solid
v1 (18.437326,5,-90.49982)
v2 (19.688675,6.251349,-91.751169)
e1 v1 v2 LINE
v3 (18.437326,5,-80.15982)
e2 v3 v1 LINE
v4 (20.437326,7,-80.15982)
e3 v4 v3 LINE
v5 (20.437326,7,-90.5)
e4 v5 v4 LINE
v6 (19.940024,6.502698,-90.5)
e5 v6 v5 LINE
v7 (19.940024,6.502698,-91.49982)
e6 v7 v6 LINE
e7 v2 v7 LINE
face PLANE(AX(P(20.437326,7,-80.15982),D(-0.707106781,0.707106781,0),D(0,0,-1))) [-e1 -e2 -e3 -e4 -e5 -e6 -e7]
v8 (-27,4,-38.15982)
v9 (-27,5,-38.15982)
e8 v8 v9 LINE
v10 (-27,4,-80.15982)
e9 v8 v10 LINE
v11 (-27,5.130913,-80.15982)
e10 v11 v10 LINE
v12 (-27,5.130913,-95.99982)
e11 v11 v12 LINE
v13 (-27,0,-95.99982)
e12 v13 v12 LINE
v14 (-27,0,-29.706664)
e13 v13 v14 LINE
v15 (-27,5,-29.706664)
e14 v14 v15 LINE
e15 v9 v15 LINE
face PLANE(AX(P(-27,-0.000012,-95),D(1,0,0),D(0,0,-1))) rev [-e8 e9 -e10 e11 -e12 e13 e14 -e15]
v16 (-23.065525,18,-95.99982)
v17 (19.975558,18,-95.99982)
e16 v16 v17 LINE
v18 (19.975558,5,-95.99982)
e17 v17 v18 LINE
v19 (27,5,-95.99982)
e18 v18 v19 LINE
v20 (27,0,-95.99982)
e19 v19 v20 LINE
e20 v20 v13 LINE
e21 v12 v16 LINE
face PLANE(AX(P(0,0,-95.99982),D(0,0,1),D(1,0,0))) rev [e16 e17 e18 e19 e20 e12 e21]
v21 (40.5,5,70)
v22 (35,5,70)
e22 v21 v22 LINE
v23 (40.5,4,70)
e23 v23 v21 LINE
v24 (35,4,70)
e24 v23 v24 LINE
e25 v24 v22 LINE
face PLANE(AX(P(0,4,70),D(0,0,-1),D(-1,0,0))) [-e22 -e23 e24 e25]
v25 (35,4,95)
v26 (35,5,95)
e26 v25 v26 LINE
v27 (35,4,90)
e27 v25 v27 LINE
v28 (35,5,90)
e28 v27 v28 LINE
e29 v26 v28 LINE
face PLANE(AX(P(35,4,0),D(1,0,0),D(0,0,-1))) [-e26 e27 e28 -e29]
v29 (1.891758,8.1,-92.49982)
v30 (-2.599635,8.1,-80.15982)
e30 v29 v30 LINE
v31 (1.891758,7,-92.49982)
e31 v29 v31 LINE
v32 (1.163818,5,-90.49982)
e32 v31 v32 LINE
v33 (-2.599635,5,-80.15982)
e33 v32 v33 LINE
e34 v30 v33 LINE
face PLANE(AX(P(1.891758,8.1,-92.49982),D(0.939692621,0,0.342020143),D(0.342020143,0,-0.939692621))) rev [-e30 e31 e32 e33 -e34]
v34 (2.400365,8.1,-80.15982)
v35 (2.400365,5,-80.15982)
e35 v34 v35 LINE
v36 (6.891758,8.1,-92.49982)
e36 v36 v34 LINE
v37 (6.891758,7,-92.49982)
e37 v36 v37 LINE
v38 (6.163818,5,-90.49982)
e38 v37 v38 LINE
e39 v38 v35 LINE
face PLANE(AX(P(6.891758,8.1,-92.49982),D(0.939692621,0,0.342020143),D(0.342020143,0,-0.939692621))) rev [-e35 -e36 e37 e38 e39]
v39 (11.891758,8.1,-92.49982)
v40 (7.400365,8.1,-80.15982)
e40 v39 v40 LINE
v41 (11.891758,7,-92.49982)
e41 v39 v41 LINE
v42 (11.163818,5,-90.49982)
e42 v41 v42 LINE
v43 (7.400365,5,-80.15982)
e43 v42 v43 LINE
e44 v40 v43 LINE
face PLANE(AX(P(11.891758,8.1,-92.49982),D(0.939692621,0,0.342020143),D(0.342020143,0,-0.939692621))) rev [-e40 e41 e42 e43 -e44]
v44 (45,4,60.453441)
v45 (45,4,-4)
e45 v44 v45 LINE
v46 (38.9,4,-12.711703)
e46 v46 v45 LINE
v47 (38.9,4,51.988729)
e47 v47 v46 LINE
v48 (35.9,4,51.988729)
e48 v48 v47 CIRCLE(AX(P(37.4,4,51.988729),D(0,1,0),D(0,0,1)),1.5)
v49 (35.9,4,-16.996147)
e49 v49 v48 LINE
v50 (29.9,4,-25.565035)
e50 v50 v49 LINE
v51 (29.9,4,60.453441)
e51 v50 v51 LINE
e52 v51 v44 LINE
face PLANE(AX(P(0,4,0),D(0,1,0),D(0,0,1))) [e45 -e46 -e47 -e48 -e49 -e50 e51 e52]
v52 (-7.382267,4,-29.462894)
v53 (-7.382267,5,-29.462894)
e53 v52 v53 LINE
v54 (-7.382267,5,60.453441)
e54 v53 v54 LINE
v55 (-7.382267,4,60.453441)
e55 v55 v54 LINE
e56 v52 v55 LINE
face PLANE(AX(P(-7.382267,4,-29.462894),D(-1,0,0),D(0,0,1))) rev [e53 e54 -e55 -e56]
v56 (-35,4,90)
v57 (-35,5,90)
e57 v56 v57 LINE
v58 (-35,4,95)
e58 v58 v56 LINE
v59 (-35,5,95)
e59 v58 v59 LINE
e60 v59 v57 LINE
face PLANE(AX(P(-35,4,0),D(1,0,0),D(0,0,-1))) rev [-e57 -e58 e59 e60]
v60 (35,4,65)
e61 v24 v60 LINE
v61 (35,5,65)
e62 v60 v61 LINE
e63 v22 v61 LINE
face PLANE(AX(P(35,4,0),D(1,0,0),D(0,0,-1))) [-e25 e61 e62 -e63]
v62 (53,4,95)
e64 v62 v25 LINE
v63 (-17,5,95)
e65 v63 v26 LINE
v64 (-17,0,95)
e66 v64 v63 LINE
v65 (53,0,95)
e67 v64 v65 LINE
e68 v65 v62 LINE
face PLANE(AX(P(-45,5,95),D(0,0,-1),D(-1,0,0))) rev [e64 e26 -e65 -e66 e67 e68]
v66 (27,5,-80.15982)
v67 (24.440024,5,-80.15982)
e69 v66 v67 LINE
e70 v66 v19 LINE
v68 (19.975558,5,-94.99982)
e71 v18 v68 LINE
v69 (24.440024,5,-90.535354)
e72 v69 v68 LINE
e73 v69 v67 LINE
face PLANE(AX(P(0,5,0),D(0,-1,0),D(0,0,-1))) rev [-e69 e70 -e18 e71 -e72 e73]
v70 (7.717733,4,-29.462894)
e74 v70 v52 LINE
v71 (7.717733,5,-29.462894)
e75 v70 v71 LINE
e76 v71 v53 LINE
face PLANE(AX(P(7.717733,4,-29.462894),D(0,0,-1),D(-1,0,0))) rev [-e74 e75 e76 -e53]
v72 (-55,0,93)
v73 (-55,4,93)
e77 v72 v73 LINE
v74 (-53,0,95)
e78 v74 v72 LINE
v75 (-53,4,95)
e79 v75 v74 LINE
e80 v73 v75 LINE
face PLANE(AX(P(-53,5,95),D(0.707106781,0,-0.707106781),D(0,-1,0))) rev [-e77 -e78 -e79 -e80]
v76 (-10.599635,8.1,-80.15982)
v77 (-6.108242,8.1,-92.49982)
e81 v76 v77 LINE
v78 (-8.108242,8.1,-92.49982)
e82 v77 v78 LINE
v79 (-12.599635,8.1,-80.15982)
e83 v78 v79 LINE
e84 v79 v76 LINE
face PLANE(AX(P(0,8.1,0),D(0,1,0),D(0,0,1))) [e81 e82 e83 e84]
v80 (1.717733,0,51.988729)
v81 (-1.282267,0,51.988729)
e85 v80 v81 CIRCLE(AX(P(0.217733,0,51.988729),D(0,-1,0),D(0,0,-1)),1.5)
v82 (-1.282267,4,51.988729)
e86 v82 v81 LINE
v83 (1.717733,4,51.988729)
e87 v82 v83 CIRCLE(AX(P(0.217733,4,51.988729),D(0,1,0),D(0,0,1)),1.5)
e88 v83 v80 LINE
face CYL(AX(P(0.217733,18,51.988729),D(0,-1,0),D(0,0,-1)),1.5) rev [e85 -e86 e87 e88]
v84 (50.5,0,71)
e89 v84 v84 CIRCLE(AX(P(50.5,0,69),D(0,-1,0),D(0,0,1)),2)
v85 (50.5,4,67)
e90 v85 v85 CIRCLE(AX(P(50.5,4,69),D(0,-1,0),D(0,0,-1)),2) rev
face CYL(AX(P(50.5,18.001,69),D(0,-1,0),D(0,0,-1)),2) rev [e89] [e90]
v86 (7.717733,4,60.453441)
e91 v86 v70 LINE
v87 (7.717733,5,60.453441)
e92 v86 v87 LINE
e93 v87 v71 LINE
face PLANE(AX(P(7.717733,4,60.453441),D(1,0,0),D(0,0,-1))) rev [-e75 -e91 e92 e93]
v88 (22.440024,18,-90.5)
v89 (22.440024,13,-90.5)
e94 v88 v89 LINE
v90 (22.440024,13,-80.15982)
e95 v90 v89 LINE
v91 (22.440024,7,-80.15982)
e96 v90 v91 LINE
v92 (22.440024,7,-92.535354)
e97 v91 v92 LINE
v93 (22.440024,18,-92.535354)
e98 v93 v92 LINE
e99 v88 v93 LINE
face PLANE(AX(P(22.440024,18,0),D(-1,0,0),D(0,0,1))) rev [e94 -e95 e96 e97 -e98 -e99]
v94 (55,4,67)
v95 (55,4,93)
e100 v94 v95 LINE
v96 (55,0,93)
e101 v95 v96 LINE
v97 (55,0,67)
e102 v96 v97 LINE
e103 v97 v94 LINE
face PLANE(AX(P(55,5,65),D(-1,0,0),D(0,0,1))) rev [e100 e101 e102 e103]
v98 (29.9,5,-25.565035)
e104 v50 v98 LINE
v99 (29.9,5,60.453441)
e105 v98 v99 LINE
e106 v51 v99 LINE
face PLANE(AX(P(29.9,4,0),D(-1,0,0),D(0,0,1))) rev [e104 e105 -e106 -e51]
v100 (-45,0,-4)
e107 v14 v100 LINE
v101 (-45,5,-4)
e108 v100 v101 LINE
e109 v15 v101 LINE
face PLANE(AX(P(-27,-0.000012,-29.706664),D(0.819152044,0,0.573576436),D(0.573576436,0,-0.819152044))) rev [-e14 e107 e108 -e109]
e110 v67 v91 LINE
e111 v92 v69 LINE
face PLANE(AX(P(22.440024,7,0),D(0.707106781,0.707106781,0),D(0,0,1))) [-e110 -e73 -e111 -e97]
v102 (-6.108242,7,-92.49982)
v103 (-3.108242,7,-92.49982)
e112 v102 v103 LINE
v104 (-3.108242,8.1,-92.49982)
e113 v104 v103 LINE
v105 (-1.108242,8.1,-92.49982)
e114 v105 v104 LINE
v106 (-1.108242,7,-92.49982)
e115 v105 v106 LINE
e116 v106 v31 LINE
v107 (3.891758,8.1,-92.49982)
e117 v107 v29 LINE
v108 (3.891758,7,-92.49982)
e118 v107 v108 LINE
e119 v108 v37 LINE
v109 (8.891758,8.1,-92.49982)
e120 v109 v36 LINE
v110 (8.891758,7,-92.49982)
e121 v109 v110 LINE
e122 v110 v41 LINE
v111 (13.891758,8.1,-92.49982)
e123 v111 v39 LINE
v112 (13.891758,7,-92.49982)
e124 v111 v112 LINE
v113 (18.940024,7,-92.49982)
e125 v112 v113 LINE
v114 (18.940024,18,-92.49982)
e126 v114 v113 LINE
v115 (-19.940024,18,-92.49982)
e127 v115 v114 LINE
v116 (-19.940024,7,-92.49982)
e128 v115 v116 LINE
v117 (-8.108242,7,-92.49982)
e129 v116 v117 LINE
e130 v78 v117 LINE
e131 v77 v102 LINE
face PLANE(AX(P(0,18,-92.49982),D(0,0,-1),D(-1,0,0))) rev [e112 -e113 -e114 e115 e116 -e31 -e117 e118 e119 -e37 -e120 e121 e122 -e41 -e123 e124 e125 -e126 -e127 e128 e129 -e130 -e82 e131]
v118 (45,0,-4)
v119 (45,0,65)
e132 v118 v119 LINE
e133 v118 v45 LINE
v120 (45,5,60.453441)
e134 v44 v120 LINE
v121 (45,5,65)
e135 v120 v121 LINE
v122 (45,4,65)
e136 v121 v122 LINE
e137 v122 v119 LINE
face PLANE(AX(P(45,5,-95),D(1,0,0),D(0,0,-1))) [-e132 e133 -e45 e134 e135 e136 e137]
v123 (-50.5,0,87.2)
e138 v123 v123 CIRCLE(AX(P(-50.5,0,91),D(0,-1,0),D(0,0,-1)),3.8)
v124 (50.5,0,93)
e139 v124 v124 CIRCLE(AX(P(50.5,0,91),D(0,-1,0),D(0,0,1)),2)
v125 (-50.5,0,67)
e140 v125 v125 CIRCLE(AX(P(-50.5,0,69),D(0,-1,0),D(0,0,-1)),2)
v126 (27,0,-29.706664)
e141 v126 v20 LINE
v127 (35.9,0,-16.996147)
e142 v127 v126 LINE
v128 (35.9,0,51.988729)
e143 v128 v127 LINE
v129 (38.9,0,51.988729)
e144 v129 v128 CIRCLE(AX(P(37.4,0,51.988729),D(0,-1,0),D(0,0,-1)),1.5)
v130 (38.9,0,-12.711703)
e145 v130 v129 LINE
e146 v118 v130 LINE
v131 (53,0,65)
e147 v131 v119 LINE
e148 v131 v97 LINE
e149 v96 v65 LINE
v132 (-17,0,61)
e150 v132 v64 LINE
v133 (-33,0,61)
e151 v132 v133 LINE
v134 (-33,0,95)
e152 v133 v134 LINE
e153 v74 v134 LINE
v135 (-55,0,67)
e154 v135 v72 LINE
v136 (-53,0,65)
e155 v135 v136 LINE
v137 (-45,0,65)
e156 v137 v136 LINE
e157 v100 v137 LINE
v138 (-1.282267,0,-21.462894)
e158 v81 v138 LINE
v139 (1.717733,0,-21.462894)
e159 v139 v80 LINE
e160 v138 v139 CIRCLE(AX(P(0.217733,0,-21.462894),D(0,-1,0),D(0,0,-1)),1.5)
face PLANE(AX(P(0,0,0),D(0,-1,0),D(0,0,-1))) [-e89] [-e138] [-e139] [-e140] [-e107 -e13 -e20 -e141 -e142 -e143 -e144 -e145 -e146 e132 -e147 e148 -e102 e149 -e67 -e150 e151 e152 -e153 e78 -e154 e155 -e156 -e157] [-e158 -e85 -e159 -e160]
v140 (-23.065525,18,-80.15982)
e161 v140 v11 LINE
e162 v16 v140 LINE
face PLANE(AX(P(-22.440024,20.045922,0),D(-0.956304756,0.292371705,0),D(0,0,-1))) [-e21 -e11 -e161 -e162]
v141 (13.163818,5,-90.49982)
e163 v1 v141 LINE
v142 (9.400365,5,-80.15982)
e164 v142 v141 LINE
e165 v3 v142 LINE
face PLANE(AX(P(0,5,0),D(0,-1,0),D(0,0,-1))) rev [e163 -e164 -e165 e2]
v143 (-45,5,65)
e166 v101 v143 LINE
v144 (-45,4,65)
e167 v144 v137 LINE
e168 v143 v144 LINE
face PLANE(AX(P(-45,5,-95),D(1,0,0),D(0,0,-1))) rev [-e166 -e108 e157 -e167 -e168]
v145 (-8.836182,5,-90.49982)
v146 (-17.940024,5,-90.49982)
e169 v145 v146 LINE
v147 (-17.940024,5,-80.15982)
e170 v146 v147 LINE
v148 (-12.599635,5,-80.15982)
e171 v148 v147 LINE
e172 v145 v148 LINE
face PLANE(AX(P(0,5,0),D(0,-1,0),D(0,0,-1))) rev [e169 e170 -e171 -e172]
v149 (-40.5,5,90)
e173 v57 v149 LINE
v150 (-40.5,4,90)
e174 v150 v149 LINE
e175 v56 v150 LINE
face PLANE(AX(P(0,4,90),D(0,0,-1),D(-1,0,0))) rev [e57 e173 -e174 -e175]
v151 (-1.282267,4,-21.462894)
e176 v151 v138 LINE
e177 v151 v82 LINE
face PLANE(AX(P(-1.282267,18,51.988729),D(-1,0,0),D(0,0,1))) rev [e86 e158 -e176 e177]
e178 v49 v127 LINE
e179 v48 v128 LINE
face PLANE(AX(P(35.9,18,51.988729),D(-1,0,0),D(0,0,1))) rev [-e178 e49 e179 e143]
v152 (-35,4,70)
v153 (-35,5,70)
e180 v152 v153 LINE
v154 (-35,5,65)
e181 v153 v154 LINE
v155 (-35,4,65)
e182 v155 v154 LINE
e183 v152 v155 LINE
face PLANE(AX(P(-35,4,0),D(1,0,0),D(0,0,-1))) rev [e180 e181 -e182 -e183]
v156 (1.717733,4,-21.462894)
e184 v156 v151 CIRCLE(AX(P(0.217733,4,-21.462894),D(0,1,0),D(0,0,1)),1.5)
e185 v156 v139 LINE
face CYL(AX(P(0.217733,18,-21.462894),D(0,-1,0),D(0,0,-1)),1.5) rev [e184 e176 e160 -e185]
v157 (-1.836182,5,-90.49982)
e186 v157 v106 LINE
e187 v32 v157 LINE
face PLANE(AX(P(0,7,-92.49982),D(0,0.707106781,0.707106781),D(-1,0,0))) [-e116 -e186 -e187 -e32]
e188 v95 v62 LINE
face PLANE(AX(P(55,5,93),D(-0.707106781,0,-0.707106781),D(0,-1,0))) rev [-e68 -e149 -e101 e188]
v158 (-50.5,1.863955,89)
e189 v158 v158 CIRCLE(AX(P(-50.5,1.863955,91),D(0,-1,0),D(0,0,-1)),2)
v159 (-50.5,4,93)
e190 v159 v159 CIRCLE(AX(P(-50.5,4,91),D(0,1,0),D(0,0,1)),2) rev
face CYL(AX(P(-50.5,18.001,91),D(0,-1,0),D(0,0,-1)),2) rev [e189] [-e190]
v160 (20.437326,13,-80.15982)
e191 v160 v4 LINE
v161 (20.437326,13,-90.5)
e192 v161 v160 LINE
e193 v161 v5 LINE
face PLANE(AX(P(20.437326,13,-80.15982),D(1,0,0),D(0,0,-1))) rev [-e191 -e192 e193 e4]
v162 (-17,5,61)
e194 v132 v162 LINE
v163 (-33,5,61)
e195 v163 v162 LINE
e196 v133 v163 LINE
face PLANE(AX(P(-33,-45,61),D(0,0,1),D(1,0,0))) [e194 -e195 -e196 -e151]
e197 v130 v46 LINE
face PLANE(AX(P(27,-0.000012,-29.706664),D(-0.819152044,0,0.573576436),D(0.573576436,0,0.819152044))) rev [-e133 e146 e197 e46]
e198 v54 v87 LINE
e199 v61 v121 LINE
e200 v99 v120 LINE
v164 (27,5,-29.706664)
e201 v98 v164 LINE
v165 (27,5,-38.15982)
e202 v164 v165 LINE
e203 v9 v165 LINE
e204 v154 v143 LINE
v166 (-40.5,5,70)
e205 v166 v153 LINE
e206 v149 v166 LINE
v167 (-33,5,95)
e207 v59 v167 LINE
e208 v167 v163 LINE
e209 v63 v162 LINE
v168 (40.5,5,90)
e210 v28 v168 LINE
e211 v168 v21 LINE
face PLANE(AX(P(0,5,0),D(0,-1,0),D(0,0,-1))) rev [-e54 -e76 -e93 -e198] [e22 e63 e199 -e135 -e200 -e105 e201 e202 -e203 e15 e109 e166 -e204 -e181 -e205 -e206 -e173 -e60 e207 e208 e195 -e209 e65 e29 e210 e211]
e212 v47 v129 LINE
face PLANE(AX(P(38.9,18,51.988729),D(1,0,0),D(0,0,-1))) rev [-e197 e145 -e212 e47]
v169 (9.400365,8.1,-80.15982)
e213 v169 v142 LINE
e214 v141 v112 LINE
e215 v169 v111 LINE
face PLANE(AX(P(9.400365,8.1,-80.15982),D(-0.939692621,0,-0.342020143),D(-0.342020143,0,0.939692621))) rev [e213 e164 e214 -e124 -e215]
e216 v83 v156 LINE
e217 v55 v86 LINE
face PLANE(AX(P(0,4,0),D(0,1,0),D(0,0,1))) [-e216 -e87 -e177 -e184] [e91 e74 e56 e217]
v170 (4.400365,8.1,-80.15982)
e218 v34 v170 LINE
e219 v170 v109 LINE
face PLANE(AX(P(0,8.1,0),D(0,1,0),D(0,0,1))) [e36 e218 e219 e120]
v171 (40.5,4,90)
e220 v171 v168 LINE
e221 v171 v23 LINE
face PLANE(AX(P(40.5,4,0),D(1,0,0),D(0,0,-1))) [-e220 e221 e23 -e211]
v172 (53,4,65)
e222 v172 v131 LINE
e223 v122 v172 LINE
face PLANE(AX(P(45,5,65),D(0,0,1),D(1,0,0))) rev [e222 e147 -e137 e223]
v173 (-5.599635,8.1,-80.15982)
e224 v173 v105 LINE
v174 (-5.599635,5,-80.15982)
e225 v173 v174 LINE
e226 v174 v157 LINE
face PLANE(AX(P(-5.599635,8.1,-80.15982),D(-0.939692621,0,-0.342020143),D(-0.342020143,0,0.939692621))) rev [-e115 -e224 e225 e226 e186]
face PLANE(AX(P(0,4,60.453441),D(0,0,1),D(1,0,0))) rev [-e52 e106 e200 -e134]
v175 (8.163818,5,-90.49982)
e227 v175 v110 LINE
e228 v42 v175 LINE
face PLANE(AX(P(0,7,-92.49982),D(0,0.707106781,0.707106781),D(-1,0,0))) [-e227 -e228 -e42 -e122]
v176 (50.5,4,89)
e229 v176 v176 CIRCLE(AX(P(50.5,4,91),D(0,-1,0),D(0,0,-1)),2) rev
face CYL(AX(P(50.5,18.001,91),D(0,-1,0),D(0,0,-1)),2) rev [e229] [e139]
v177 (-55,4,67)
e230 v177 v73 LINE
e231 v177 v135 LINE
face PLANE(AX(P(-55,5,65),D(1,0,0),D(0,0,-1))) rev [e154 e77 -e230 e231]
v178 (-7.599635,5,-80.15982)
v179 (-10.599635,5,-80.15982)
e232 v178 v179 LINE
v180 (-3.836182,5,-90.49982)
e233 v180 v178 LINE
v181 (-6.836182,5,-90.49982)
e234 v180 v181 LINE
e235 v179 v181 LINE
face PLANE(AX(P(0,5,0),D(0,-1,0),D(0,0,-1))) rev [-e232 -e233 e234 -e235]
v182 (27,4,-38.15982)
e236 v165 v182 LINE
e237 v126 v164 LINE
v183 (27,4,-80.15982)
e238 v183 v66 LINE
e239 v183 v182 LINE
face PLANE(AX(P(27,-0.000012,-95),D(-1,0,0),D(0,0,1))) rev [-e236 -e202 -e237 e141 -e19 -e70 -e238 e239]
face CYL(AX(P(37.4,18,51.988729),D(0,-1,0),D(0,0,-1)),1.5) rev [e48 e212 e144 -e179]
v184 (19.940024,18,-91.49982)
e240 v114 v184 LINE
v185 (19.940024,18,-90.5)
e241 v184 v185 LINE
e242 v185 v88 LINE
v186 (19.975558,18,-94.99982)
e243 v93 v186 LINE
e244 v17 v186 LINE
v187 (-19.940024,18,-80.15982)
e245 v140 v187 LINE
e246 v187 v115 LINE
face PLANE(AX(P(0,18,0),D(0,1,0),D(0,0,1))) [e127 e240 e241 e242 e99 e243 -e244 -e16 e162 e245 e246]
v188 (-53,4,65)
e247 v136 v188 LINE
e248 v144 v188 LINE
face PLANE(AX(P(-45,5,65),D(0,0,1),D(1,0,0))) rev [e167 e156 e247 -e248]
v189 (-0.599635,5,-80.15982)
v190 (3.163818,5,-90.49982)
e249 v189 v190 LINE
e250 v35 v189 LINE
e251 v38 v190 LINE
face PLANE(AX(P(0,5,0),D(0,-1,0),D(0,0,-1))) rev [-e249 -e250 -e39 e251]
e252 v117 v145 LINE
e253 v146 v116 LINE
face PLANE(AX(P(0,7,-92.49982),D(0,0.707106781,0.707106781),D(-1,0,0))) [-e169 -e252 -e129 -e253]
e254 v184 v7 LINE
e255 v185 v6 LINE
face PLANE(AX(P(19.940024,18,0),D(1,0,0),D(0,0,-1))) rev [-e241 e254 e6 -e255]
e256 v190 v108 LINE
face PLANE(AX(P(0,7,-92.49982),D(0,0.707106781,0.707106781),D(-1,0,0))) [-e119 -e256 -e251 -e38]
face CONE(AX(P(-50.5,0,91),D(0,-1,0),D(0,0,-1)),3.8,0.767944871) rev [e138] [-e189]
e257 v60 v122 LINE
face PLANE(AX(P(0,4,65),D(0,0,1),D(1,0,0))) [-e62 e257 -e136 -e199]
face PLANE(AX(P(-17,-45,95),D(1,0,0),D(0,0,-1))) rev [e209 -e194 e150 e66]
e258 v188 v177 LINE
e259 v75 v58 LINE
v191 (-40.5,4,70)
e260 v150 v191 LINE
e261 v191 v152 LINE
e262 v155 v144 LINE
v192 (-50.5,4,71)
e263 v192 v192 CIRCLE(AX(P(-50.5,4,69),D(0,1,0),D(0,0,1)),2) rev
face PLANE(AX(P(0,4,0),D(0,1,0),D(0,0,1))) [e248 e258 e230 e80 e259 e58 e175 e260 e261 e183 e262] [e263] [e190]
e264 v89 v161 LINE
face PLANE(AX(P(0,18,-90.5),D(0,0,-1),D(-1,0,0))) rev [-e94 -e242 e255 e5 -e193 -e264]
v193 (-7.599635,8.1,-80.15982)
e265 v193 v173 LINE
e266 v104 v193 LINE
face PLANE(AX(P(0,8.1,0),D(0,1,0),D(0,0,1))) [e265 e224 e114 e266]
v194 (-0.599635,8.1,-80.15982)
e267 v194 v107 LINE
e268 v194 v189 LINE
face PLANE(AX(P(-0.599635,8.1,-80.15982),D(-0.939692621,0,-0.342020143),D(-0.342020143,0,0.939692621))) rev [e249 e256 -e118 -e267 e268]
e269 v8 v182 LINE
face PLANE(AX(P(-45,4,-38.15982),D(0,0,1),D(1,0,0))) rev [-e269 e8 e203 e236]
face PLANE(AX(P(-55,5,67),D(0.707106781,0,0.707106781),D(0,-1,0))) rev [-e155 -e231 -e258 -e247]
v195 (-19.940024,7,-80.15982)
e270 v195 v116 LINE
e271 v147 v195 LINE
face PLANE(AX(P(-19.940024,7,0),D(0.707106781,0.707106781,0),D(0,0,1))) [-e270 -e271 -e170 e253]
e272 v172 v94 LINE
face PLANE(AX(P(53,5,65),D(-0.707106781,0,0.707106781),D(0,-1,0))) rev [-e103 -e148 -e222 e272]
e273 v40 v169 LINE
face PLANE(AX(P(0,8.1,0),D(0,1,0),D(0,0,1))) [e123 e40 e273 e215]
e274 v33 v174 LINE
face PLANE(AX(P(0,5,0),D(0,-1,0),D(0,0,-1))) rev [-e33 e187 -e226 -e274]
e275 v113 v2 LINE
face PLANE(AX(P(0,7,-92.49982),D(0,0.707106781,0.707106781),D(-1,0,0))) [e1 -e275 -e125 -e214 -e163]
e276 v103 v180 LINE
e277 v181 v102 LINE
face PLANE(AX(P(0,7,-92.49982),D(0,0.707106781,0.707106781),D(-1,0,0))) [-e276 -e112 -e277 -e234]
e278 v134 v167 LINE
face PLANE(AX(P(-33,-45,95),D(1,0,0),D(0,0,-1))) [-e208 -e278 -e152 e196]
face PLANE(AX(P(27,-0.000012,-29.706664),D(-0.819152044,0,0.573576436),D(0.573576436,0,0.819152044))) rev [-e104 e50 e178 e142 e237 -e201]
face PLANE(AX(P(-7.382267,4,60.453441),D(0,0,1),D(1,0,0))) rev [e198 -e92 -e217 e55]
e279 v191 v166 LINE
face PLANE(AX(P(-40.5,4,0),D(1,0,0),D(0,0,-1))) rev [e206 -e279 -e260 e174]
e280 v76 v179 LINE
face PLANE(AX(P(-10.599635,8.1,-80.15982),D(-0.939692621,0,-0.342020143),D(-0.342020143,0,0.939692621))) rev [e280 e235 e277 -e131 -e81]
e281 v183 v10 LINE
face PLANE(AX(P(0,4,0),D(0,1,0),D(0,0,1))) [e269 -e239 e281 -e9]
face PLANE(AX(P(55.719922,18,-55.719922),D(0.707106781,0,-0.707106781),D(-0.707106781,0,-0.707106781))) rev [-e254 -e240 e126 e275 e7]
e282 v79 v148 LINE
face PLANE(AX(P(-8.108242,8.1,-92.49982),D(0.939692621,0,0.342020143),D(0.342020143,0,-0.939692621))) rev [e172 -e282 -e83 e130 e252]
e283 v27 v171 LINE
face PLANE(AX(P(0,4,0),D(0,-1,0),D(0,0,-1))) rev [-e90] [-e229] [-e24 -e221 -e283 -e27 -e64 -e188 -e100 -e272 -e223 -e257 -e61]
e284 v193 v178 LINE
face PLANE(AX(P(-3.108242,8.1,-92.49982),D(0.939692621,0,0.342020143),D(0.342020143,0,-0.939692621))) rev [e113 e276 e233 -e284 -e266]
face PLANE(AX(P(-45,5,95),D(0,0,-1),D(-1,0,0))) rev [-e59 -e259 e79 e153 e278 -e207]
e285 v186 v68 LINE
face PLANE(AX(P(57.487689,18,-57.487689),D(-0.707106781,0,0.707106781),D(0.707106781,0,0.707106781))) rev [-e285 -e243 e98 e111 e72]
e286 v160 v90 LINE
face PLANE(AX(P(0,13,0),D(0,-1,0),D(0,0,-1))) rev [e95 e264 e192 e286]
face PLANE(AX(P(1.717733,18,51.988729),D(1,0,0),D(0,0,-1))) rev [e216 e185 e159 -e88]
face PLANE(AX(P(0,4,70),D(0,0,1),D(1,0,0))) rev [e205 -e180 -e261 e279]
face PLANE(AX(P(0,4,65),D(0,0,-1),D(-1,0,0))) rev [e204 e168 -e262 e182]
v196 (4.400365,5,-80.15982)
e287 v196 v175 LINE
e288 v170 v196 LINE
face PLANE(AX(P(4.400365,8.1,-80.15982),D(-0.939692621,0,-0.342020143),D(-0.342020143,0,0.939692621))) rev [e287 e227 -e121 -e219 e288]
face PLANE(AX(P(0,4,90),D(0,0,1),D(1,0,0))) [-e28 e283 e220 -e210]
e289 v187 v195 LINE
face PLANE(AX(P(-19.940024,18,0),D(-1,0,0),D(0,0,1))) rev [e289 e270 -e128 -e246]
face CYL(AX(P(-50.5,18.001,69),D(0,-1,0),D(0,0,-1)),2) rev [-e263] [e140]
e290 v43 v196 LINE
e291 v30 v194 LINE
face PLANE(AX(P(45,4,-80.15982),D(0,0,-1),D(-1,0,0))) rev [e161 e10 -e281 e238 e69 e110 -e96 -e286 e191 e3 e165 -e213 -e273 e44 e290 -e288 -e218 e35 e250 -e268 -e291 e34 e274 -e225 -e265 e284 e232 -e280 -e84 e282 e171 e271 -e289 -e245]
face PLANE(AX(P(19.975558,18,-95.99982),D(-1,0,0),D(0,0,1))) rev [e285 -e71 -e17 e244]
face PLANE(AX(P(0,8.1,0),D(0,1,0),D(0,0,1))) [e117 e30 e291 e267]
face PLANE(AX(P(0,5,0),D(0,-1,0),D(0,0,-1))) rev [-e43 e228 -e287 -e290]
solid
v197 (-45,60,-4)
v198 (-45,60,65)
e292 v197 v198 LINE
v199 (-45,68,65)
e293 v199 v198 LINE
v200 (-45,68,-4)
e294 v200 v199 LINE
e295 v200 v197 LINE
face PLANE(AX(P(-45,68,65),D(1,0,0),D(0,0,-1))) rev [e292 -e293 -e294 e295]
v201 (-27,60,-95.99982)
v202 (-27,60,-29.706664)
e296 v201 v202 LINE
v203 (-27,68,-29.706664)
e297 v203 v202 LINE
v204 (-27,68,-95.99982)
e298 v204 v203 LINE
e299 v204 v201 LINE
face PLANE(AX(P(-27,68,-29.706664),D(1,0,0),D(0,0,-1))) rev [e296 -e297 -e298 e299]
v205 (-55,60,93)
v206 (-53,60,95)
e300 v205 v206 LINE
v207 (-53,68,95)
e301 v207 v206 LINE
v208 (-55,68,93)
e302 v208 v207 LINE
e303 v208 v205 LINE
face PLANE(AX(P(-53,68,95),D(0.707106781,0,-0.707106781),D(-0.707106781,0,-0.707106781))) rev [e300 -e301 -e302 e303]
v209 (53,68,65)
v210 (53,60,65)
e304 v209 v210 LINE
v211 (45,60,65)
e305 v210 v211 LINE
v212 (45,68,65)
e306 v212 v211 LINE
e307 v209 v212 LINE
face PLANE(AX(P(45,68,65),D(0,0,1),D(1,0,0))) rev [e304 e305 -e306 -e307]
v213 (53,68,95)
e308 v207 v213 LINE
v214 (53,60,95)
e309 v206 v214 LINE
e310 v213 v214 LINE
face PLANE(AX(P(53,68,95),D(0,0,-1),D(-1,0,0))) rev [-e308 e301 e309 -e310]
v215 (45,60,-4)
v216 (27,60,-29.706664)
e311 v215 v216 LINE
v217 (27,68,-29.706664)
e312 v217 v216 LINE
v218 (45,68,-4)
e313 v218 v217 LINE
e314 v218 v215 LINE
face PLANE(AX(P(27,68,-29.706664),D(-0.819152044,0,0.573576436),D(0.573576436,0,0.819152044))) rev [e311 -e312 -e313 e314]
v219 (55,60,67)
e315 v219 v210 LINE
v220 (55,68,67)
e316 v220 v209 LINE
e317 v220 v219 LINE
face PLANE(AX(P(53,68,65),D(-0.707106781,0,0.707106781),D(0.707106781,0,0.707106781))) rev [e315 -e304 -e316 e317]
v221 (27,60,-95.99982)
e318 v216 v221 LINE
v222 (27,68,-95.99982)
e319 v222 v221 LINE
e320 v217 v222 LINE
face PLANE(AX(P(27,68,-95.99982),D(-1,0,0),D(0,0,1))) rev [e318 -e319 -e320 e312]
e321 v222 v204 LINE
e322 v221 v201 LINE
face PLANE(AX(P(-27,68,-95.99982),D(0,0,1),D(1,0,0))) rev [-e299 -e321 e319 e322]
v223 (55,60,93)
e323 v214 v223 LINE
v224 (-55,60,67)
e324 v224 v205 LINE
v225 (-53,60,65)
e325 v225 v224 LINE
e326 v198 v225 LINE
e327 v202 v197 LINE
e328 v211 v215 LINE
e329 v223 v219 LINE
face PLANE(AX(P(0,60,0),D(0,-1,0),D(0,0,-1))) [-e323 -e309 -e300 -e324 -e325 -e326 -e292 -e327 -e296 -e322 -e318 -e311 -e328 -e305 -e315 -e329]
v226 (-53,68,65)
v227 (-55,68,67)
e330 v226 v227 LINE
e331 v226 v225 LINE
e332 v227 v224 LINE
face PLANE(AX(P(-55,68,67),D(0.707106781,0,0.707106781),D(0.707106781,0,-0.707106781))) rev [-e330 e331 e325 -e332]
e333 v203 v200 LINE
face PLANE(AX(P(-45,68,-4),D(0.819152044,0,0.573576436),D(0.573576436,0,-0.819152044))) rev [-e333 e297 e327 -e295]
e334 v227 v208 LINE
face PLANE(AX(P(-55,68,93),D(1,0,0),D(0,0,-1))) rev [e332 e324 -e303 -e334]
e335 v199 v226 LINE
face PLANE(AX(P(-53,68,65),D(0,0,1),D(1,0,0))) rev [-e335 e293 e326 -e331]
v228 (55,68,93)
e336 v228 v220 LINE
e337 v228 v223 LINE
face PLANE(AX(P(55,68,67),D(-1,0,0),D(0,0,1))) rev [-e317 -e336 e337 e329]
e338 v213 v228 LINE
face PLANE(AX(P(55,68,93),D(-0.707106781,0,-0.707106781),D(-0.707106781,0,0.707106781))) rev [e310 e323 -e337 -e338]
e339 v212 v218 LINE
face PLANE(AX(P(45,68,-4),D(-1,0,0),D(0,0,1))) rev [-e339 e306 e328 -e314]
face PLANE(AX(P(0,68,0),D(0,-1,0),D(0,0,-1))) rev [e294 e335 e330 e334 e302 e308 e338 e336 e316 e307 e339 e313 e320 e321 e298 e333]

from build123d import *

# Parameters (mm, degrees)
SKETCH1_W                     = 90
SKETCH1_H                     = 190
BOSS_EXTRUDE1_DEPTH           = 5
SKETCH2_W                     = 10
SKETCH2_H                     = 30
BOSS_EXTRUDE2_DEPTH           = 5
CHAMFER1_SIZE                 = 2
SKETCH3_W                     = 16
SKETCH3_H                     = 34
CUT_EXTRUDE1_DEPTH            = 50
SKETCH4_W                     = 90
SKETCH4_H                     = 42
CUT_EXTRUDE2_DEPTH            = 1
SKETCH7_W                     = 15.1
SKETCH7_H                     = 89.916335477
CUT_EXTRUDE7_DEPTH            = 1
BOSS_EXTRUDE4_START           = 5
BOSS_EXTRUDE4_DEPTH           = 13
BOSS_EXTRUDE5_DEPTH           = 3.1
CUT_EXTRUDE11_START           = 5
CUT_EXTRUDE11_DEPTH           = 1
CUT_EXTRUDE12_DEPTH           = 112.23848255
CUT_EXTRUDE12_DEPTH_BACK      = 112.23848255
BOSS_EXTRUDE6_DEPTH           = 1
CHAMFER4_SIZE                 = 2
CUT_EXTRUDE13_REACH           = 114.094
SKETCH23_R                    = 2
CUT_EXTRUDE14_DEPTH           = 113.093556715
CUT_EXTRUDE14_DEPTH_BACK      = 113.093556715
SKETCH26_R                    = 3.8
CUT_EXTRUDE15_DEPTH           = 2.5
CUT_EXTRUDE15_TAPER           = 44
CUT_EXTRUDE15_OTHER_WAY_DEPTH = 113.093556715
SKETCH27_W                    = 2.002698481
SKETCH27_H                    = 10.340179912
BOSS_EXTRUDE7_DEPTH           = 8
CHAMFER5_SIZE                 = 2
CHAMFER6_SIZE                 = 15.045922045
CHAMFER6_SIZE_2               = 4.6
CHAMFER7_SIZE                 = 2
BOSS_EXTRUDE8_START           = 60
BOSS_EXTRUDE8_DEPTH           = 8


with BuildPart() as part:
    # Sketch1 → Boss-Extrude1 (new body)
    with BuildSketch(Plane(origin=(0, 0, 0), x_dir=(1, 0, 0), z_dir=(0, 1, 0))):
        Rectangle(SKETCH1_W, SKETCH1_H)
    extrude(amount=BOSS_EXTRUDE1_DEPTH)

    # Sketch2 → Boss-Extrude2 (add)
    with BuildSketch(Plane(origin=(0, 0, 0), x_dir=(1, 0, 0), z_dir=(0, 1, 0))):
        with Locations((-50, -80)):
            Rectangle(SKETCH2_W, SKETCH2_H)
        with Locations((50, -80)):
            Rectangle(SKETCH2_W, SKETCH2_H)
    extrude(amount=BOSS_EXTRUDE2_DEPTH)

    # Chamfer1
    chamfer1_edges = [part.edges().sort_by_distance(p)[0] for p in [
        (-55, 2.5, 65),
        (-55, 2.5, 95),
        (55, 2.5, 95),
        (55, 2.5, 65),
    ]]
    chamfer(chamfer1_edges, length=CHAMFER1_SIZE)

    # Sketch3 → Cut-Extrude1 (cut)
    with BuildSketch(Plane(origin=(0, 5, 0), x_dir=(1, 0, 0), z_dir=(0, 1, 0))):
        with Locations((-25, -78)):
            Rectangle(SKETCH3_W, SKETCH3_H)
    extrude(amount=-CUT_EXTRUDE1_DEPTH, mode=Mode.SUBTRACT)

    # Sketch4 → Cut-Extrude2 (cut)
    with BuildSketch(Plane(origin=(0, 5, 0), x_dir=(1, 0, 0), z_dir=(0, 1, 0))):
        with Locations((0, 59.159820088)):
            Rectangle(SKETCH4_W, SKETCH4_H)
    extrude(amount=-CUT_EXTRUDE2_DEPTH, mode=Mode.SUBTRACT)

    # Sketch7 → Cut-Extrude7 (cut)
    with BuildSketch(Plane(origin=(0, 5, 0), x_dir=(1, 0, 0), z_dir=(0, 1, 0))):
        with Locations((37.45, -15.495273531)):
            Rectangle(SKETCH7_W, SKETCH7_H)
        with Locations((0.16773297, -15.495273531)):
            Rectangle(SKETCH7_W, SKETCH7_H)
    extrude(amount=-CUT_EXTRUDE7_DEPTH, mode=Mode.SUBTRACT)

    # Sketch17 → Boss-Extrude4 (add)
    with BuildSketch(Plane(origin=(0, 0, 0), x_dir=(1, 0, 0), z_dir=(0, 1, 0)).offset(BOSS_EXTRUDE4_START)):
        Polygon((-22.440023983, 80.159820088), (-19.940023983, 80.159820088), (-19.940023983, 92.499820088), (18.940023983, 92.499820088), (19.940023983, 91.499820088), (19.940023983, 90.5), (22.440023983, 90.5), (22.440023983, 92.535353994), (19.975557889, 94.999820088), (-22.440023983, 94.999820088), align=None)
    extrude(amount=BOSS_EXTRUDE4_DEPTH)

    # Sketch18 → Boss-Extrude5 (add)
    with BuildSketch(Plane(origin=(0, 5, 0), x_dir=(1, 0, 0), z_dir=(0, 1, 0))):
        Polygon((-12.599634528, 80.159820088), (-10.599634528, 80.159820088), (-6.108241837, 92.499820088), (-8.108241837, 92.499820088), align=None)
        Polygon((-3.108241837, 92.499820088), (-7.599634528, 80.159820088), (-5.599634528, 80.159820088), (-1.108241837, 92.499820088), align=None)
        Polygon((1.891758163, 92.499820088), (-2.599634528, 80.159820088), (-0.599634528, 80.159820088), (3.891758163, 92.499820088), align=None)
        Polygon((6.891758163, 92.499820088), (2.400365472, 80.159820088), (4.400365472, 80.159820088), (8.891758163, 92.499820088), align=None)
        Polygon((11.891758163, 92.499820088), (7.400365472, 80.159820088), (9.400365472, 80.159820088), (13.891758163, 92.499820088), align=None)
    extrude(amount=BOSS_EXTRUDE5_DEPTH)

    # Sketch19 → Cut-Extrude11 (cut)
    with BuildSketch(Plane(origin=(0, 0, 0), x_dir=(1, 0, 0), z_dir=(0, 1, 0)).offset(CUT_EXTRUDE11_START)):
        Polygon((-35, -65), (-35, -70), (-40.5, -70), (-40.5, -90), (-35, -90), (-35, -95), (-53, -95), (-55, -93), (-55, -67), (-53, -65), align=None)
    cut_extrude11 = extrude(amount=-CUT_EXTRUDE11_DEPTH, mode=Mode.SUBTRACT)

    # Mirror1: Cut-Extrude11 across plane
    add(cut_extrude11.mirror(Plane(origin=(0, 0, 0), x_dir=(0, 0, 1), z_dir=(1, 0, 0))), mode=Mode.SUBTRACT)

    # Sketch20 → Cut-Extrude12 (cut, two sides: drawn at the far end of the back side and taken through both)
    with BuildSketch(Plane(origin=(0, 0, 0), x_dir=(1, 0, 0), z_dir=(0, 1, 0)).offset(-CUT_EXTRUDE12_DEPTH_BACK)):
        Polygon((-27, 29.706664121), (-45, 4), (-45, 95), (-27, 95), align=None)
        Polygon((27, 95), (27, 29.706664121), (45, 4), (45, 95), align=None)
    extrude(amount=CUT_EXTRUDE12_DEPTH + CUT_EXTRUDE12_DEPTH_BACK, mode=Mode.SUBTRACT)

    # Sketch22 → Boss-Extrude6 (add)
    with BuildSketch(Plane(origin=(0, 0, -94.999820088), x_dir=(-1, 0, 0), z_dir=(0, 0, -1))):
        Polygon((-19.975557889, 5), (-27, 5), (-27, 0), (27, 0), (27, 5), (22.440023983, 5), (22.440023983, 18), (-19.975557889, 18), align=None)
    extrude(amount=BOSS_EXTRUDE6_DEPTH)

    # Chamfer4
    chamfer4_edges = [part.edges().sort_by_distance(p)[0] for p in [
        (-19.940023983, 5, -86.329820088),
        (-14.02413291, 5, -92.499820088),
        (-4.608241837, 5, -92.499820088),
        (0.391758163, 5, -92.499820088),
        (5.391758163, 5, -92.499820088),
        (10.391758163, 5, -92.499820088),
    ]]
    chamfer(chamfer4_edges, length=CHAMFER4_SIZE)

    # Sketch23 → Cut-Extrude13 (cut, up to next)
    with BuildSketch(Plane.XZ, mode=Mode.PRIVATE) as cut_extrude13_sk1:
        with Locations(Location((-50.5, 91, 0), (0, 0, 270))):
            Circle(SKETCH23_R)
    cut_extrude13_tool1 = extrude(cut_extrude13_sk1.sketch, amount=-CUT_EXTRUDE13_REACH, mode=Mode.PRIVATE) & part.part
    # Sketch23 → Cut-Extrude13 (cut, up to next)
    with BuildSketch(Plane.XZ, mode=Mode.PRIVATE) as cut_extrude13_sk2:
        with Locations(Location((-50.5, 69, 0), (0, 0, 270))):
            Circle(SKETCH23_R)
    cut_extrude13_tool2 = extrude(cut_extrude13_sk2.sketch, amount=-CUT_EXTRUDE13_REACH, mode=Mode.PRIVATE) & part.part
    # Sketch23 → Cut-Extrude13 (cut, up to next)
    with BuildSketch(Plane.XZ, mode=Mode.PRIVATE) as cut_extrude13_sk3:
        with Locations(Location((50.5, 69, 0), (0, 0, 270))):
            Circle(SKETCH23_R)
    cut_extrude13_tool3 = extrude(cut_extrude13_sk3.sketch, amount=-CUT_EXTRUDE13_REACH, mode=Mode.PRIVATE) & part.part
    # Sketch23 → Cut-Extrude13 (cut, up to next)
    with BuildSketch(Plane.XZ, mode=Mode.PRIVATE) as cut_extrude13_sk4:
        with Locations(Location((50.5, 91, 0), (0, 0, 270))):
            Circle(SKETCH23_R)
    cut_extrude13_tool4 = extrude(cut_extrude13_sk4.sketch, amount=-CUT_EXTRUDE13_REACH, mode=Mode.PRIVATE) & part.part
    add(cut_extrude13_tool1.solids().sort_by_distance((-50.5, 0, 91))[0], mode=Mode.SUBTRACT)
    add(cut_extrude13_tool2.solids().sort_by_distance((-50.5, 0, 69))[0], mode=Mode.SUBTRACT)
    add(cut_extrude13_tool3.solids().sort_by_distance((50.5, 0, 69))[0], mode=Mode.SUBTRACT)
    add(cut_extrude13_tool4.solids().sort_by_distance((50.5, 0, 91))[0], mode=Mode.SUBTRACT)

    # Sketch25 → Cut-Extrude14 (cut, two sides: drawn at the far end of the back side and taken through both)
    with BuildSketch(Plane.XZ.offset(-CUT_EXTRUDE14_DEPTH_BACK)):
        with BuildLine():
            Line((1.71773297, 51.988728589), (1.71773297, -21.462894208))
            ThreePointArc((1.71773297, -21.462894208), (0.21773297, -22.962894208), (-1.28226703, -21.462894208))
            Line((-1.28226703, -21.462894208), (-1.28226703, 51.988728589))
            ThreePointArc((-1.28226703, 51.988728589), (0.21773297, 53.488728589), (1.71773297, 51.988728589))
        make_face()
        with BuildLine():
            Line((38.9, 51.988728589), (38.9, -21.462894208))
            ThreePointArc((38.9, -21.462894208), (37.4, -22.962894208), (35.9, -21.462894208))
            Line((35.9, -21.462894208), (35.9, 51.988728589))
            ThreePointArc((35.9, 51.988728589), (37.4, 53.488728589), (38.9, 51.988728589))
        make_face()
    extrude(amount=CUT_EXTRUDE14_DEPTH + CUT_EXTRUDE14_DEPTH_BACK, mode=Mode.SUBTRACT)

    # Sketch26 → Cut-Extrude15 (cut)
    with BuildSketch(Plane.XZ):
        with Locations((-50.5, 91)):
            Circle(SKETCH26_R)
    extrude(amount=-CUT_EXTRUDE15_DEPTH, taper=CUT_EXTRUDE15_TAPER, mode=Mode.SUBTRACT)

    # Sketch26 → Cut-Extrude15 other way (cut)
    with BuildSketch(Plane.XZ):
        with Locations((-50.5, 91)):
            Circle(SKETCH26_R)
    extrude(amount=CUT_EXTRUDE15_OTHER_WAY_DEPTH, mode=Mode.SUBTRACT)

    # Sketch27 → Boss-Extrude7 (add)
    with BuildSketch(Plane(origin=(0, 5, 0), x_dir=(1, 0, 0), z_dir=(0, 1, 0))):
        with Locations((21.438674742, 85.329910044)):
            Rectangle(SKETCH27_W, SKETCH27_H)
    extrude(amount=BOSS_EXTRUDE7_DEPTH)

    # Chamfer5
    chamfer5_edges = [part.edges().sort_by_distance(p)[0] for p in [
        (22.440023983, 5, -86.347587041),
    ]]
    chamfer(chamfer5_edges, length=CHAMFER5_SIZE)

    # Chamfer6
    # the kernel refuses this chamfer: 15.045922045, 4.6 mm, written as the material it adds along each edge
    with BuildSketch(Plane(origin=(-22.440023983, 5, -80.159820088), x_dir=(0.011263281176818154, 0.9999365672367082, 0), z_dir=(0, 0, -1))) as chamfer6_piece_1_section:
        Polygon((CHAMFER6_SIZE * 0.999936567239, -CHAMFER6_SIZE * 0.0112632811768), (-CHAMFER6_SIZE_2 * 0.0112632811768, -CHAMFER6_SIZE_2 * 0.999936567237), (0, 0), align=None)
    chamfer6_piece_1 = extrude(amount=15.84, mode=Mode.PRIVATE)
    chamfer6_piece_1 = split(chamfer6_piece_1, bisect_by=Plane(origin=(-23.998082586, 18, -88.079820088), z_dir=(0, -1, 0)), keep=Keep.TOP, mode=Mode.PRIVATE)
    chamfer6_piece_1 = split(chamfer6_piece_1, bisect_by=Plane(origin=(-27, 9.852411417, -88.079820088), z_dir=(1, 0, 0)), keep=Keep.TOP, mode=Mode.PRIVATE)
    add(chamfer6_piece_1)

    # Chamfer7
    # the kernel refuses this chamfer: 2 mm, written as the material it adds along each edge
    with BuildSketch(Plane(origin=(8.748392187, 5, -92.499820088), x_dir=(-2.155664593802373e-14, -0.027495876610586414, 0.9996219169112968), z_dir=(1, 0, 0))) as chamfer7_piece_1_section:
        Polygon((CHAMFER7_SIZE * 0.999621916911, -CHAMFER7_SIZE * 0.0274958766106), (-CHAMFER7_SIZE * 0.0274958766106, -CHAMFER7_SIZE * 0.999621916911), (0, 0), align=None)
    chamfer7_piece_1 = extrude(amount=15.334997772, mode=Mode.PRIVATE)
    chamfer7_piece_1 = split(chamfer7_piece_1, bisect_by=Plane(origin=(20.49595334, 8.944070643, -90.499940029), z_dir=(-0.7071067811865476, -0.7071067811865476, -1.2691553730131522e-15)), keep=Keep.TOP, mode=Mode.PRIVATE)
    chamfer7_piece_1 = split(chamfer7_piece_1, bisect_by=Plane(origin=(20.513690307, 5.000059971, -94.46168767), z_dir=(-0.7071067811865465, 0, 0.7071067811865486)), keep=Keep.TOP, mode=Mode.PRIVATE)
    add(chamfer7_piece_1)
    with BuildSketch(Plane(origin=(20.437325502, 5, -80.159820088), x_dir=(-0.9996219169112968, -0.02749587661058651, 0), z_dir=(0, 0, -1))) as chamfer7_piece_2_section:
        Polygon((CHAMFER7_SIZE * 0.999621916911, CHAMFER7_SIZE * 0.0274958766106), (-CHAMFER7_SIZE * 0.0274958766106, CHAMFER7_SIZE * 0.999621916911), (0, 0), align=None)
    chamfer7_piece_2 = extrude(amount=15.483545888, mode=Mode.PRIVATE)
    chamfer7_piece_2 = split(chamfer7_piece_2, bisect_by=Plane(origin=(24.542296211, 5.500899494, -90.433081766), z_dir=(-0.7071067811865465, 0, 0.7071067811865486)), keep=Keep.TOP, mode=Mode.PRIVATE)
    add(chamfer7_piece_2)


with BuildPart() as body_2:
    # Sketch28 → Boss-Extrude8 (new body)
    with BuildSketch(Plane(origin=(0, 0, 0), x_dir=(1, 0, 0), z_dir=(0, 1, 0)).offset(BOSS_EXTRUDE8_START)):
        Polygon((-53, -95), (-55, -93), (-55, -67), (-53, -65), (-45, -65), (-45, 4), (-27, 29.706664121), (-27, 95.999820088), (27, 95.999820088), (27, 29.706664121), (45, 4), (45, -65), (53, -65), (55, -67), (55, -93), (53, -95), align=None)
    extrude(amount=BOSS_EXTRUDE8_DEPTH)


solid = Compound([part.part, body_2.part])
